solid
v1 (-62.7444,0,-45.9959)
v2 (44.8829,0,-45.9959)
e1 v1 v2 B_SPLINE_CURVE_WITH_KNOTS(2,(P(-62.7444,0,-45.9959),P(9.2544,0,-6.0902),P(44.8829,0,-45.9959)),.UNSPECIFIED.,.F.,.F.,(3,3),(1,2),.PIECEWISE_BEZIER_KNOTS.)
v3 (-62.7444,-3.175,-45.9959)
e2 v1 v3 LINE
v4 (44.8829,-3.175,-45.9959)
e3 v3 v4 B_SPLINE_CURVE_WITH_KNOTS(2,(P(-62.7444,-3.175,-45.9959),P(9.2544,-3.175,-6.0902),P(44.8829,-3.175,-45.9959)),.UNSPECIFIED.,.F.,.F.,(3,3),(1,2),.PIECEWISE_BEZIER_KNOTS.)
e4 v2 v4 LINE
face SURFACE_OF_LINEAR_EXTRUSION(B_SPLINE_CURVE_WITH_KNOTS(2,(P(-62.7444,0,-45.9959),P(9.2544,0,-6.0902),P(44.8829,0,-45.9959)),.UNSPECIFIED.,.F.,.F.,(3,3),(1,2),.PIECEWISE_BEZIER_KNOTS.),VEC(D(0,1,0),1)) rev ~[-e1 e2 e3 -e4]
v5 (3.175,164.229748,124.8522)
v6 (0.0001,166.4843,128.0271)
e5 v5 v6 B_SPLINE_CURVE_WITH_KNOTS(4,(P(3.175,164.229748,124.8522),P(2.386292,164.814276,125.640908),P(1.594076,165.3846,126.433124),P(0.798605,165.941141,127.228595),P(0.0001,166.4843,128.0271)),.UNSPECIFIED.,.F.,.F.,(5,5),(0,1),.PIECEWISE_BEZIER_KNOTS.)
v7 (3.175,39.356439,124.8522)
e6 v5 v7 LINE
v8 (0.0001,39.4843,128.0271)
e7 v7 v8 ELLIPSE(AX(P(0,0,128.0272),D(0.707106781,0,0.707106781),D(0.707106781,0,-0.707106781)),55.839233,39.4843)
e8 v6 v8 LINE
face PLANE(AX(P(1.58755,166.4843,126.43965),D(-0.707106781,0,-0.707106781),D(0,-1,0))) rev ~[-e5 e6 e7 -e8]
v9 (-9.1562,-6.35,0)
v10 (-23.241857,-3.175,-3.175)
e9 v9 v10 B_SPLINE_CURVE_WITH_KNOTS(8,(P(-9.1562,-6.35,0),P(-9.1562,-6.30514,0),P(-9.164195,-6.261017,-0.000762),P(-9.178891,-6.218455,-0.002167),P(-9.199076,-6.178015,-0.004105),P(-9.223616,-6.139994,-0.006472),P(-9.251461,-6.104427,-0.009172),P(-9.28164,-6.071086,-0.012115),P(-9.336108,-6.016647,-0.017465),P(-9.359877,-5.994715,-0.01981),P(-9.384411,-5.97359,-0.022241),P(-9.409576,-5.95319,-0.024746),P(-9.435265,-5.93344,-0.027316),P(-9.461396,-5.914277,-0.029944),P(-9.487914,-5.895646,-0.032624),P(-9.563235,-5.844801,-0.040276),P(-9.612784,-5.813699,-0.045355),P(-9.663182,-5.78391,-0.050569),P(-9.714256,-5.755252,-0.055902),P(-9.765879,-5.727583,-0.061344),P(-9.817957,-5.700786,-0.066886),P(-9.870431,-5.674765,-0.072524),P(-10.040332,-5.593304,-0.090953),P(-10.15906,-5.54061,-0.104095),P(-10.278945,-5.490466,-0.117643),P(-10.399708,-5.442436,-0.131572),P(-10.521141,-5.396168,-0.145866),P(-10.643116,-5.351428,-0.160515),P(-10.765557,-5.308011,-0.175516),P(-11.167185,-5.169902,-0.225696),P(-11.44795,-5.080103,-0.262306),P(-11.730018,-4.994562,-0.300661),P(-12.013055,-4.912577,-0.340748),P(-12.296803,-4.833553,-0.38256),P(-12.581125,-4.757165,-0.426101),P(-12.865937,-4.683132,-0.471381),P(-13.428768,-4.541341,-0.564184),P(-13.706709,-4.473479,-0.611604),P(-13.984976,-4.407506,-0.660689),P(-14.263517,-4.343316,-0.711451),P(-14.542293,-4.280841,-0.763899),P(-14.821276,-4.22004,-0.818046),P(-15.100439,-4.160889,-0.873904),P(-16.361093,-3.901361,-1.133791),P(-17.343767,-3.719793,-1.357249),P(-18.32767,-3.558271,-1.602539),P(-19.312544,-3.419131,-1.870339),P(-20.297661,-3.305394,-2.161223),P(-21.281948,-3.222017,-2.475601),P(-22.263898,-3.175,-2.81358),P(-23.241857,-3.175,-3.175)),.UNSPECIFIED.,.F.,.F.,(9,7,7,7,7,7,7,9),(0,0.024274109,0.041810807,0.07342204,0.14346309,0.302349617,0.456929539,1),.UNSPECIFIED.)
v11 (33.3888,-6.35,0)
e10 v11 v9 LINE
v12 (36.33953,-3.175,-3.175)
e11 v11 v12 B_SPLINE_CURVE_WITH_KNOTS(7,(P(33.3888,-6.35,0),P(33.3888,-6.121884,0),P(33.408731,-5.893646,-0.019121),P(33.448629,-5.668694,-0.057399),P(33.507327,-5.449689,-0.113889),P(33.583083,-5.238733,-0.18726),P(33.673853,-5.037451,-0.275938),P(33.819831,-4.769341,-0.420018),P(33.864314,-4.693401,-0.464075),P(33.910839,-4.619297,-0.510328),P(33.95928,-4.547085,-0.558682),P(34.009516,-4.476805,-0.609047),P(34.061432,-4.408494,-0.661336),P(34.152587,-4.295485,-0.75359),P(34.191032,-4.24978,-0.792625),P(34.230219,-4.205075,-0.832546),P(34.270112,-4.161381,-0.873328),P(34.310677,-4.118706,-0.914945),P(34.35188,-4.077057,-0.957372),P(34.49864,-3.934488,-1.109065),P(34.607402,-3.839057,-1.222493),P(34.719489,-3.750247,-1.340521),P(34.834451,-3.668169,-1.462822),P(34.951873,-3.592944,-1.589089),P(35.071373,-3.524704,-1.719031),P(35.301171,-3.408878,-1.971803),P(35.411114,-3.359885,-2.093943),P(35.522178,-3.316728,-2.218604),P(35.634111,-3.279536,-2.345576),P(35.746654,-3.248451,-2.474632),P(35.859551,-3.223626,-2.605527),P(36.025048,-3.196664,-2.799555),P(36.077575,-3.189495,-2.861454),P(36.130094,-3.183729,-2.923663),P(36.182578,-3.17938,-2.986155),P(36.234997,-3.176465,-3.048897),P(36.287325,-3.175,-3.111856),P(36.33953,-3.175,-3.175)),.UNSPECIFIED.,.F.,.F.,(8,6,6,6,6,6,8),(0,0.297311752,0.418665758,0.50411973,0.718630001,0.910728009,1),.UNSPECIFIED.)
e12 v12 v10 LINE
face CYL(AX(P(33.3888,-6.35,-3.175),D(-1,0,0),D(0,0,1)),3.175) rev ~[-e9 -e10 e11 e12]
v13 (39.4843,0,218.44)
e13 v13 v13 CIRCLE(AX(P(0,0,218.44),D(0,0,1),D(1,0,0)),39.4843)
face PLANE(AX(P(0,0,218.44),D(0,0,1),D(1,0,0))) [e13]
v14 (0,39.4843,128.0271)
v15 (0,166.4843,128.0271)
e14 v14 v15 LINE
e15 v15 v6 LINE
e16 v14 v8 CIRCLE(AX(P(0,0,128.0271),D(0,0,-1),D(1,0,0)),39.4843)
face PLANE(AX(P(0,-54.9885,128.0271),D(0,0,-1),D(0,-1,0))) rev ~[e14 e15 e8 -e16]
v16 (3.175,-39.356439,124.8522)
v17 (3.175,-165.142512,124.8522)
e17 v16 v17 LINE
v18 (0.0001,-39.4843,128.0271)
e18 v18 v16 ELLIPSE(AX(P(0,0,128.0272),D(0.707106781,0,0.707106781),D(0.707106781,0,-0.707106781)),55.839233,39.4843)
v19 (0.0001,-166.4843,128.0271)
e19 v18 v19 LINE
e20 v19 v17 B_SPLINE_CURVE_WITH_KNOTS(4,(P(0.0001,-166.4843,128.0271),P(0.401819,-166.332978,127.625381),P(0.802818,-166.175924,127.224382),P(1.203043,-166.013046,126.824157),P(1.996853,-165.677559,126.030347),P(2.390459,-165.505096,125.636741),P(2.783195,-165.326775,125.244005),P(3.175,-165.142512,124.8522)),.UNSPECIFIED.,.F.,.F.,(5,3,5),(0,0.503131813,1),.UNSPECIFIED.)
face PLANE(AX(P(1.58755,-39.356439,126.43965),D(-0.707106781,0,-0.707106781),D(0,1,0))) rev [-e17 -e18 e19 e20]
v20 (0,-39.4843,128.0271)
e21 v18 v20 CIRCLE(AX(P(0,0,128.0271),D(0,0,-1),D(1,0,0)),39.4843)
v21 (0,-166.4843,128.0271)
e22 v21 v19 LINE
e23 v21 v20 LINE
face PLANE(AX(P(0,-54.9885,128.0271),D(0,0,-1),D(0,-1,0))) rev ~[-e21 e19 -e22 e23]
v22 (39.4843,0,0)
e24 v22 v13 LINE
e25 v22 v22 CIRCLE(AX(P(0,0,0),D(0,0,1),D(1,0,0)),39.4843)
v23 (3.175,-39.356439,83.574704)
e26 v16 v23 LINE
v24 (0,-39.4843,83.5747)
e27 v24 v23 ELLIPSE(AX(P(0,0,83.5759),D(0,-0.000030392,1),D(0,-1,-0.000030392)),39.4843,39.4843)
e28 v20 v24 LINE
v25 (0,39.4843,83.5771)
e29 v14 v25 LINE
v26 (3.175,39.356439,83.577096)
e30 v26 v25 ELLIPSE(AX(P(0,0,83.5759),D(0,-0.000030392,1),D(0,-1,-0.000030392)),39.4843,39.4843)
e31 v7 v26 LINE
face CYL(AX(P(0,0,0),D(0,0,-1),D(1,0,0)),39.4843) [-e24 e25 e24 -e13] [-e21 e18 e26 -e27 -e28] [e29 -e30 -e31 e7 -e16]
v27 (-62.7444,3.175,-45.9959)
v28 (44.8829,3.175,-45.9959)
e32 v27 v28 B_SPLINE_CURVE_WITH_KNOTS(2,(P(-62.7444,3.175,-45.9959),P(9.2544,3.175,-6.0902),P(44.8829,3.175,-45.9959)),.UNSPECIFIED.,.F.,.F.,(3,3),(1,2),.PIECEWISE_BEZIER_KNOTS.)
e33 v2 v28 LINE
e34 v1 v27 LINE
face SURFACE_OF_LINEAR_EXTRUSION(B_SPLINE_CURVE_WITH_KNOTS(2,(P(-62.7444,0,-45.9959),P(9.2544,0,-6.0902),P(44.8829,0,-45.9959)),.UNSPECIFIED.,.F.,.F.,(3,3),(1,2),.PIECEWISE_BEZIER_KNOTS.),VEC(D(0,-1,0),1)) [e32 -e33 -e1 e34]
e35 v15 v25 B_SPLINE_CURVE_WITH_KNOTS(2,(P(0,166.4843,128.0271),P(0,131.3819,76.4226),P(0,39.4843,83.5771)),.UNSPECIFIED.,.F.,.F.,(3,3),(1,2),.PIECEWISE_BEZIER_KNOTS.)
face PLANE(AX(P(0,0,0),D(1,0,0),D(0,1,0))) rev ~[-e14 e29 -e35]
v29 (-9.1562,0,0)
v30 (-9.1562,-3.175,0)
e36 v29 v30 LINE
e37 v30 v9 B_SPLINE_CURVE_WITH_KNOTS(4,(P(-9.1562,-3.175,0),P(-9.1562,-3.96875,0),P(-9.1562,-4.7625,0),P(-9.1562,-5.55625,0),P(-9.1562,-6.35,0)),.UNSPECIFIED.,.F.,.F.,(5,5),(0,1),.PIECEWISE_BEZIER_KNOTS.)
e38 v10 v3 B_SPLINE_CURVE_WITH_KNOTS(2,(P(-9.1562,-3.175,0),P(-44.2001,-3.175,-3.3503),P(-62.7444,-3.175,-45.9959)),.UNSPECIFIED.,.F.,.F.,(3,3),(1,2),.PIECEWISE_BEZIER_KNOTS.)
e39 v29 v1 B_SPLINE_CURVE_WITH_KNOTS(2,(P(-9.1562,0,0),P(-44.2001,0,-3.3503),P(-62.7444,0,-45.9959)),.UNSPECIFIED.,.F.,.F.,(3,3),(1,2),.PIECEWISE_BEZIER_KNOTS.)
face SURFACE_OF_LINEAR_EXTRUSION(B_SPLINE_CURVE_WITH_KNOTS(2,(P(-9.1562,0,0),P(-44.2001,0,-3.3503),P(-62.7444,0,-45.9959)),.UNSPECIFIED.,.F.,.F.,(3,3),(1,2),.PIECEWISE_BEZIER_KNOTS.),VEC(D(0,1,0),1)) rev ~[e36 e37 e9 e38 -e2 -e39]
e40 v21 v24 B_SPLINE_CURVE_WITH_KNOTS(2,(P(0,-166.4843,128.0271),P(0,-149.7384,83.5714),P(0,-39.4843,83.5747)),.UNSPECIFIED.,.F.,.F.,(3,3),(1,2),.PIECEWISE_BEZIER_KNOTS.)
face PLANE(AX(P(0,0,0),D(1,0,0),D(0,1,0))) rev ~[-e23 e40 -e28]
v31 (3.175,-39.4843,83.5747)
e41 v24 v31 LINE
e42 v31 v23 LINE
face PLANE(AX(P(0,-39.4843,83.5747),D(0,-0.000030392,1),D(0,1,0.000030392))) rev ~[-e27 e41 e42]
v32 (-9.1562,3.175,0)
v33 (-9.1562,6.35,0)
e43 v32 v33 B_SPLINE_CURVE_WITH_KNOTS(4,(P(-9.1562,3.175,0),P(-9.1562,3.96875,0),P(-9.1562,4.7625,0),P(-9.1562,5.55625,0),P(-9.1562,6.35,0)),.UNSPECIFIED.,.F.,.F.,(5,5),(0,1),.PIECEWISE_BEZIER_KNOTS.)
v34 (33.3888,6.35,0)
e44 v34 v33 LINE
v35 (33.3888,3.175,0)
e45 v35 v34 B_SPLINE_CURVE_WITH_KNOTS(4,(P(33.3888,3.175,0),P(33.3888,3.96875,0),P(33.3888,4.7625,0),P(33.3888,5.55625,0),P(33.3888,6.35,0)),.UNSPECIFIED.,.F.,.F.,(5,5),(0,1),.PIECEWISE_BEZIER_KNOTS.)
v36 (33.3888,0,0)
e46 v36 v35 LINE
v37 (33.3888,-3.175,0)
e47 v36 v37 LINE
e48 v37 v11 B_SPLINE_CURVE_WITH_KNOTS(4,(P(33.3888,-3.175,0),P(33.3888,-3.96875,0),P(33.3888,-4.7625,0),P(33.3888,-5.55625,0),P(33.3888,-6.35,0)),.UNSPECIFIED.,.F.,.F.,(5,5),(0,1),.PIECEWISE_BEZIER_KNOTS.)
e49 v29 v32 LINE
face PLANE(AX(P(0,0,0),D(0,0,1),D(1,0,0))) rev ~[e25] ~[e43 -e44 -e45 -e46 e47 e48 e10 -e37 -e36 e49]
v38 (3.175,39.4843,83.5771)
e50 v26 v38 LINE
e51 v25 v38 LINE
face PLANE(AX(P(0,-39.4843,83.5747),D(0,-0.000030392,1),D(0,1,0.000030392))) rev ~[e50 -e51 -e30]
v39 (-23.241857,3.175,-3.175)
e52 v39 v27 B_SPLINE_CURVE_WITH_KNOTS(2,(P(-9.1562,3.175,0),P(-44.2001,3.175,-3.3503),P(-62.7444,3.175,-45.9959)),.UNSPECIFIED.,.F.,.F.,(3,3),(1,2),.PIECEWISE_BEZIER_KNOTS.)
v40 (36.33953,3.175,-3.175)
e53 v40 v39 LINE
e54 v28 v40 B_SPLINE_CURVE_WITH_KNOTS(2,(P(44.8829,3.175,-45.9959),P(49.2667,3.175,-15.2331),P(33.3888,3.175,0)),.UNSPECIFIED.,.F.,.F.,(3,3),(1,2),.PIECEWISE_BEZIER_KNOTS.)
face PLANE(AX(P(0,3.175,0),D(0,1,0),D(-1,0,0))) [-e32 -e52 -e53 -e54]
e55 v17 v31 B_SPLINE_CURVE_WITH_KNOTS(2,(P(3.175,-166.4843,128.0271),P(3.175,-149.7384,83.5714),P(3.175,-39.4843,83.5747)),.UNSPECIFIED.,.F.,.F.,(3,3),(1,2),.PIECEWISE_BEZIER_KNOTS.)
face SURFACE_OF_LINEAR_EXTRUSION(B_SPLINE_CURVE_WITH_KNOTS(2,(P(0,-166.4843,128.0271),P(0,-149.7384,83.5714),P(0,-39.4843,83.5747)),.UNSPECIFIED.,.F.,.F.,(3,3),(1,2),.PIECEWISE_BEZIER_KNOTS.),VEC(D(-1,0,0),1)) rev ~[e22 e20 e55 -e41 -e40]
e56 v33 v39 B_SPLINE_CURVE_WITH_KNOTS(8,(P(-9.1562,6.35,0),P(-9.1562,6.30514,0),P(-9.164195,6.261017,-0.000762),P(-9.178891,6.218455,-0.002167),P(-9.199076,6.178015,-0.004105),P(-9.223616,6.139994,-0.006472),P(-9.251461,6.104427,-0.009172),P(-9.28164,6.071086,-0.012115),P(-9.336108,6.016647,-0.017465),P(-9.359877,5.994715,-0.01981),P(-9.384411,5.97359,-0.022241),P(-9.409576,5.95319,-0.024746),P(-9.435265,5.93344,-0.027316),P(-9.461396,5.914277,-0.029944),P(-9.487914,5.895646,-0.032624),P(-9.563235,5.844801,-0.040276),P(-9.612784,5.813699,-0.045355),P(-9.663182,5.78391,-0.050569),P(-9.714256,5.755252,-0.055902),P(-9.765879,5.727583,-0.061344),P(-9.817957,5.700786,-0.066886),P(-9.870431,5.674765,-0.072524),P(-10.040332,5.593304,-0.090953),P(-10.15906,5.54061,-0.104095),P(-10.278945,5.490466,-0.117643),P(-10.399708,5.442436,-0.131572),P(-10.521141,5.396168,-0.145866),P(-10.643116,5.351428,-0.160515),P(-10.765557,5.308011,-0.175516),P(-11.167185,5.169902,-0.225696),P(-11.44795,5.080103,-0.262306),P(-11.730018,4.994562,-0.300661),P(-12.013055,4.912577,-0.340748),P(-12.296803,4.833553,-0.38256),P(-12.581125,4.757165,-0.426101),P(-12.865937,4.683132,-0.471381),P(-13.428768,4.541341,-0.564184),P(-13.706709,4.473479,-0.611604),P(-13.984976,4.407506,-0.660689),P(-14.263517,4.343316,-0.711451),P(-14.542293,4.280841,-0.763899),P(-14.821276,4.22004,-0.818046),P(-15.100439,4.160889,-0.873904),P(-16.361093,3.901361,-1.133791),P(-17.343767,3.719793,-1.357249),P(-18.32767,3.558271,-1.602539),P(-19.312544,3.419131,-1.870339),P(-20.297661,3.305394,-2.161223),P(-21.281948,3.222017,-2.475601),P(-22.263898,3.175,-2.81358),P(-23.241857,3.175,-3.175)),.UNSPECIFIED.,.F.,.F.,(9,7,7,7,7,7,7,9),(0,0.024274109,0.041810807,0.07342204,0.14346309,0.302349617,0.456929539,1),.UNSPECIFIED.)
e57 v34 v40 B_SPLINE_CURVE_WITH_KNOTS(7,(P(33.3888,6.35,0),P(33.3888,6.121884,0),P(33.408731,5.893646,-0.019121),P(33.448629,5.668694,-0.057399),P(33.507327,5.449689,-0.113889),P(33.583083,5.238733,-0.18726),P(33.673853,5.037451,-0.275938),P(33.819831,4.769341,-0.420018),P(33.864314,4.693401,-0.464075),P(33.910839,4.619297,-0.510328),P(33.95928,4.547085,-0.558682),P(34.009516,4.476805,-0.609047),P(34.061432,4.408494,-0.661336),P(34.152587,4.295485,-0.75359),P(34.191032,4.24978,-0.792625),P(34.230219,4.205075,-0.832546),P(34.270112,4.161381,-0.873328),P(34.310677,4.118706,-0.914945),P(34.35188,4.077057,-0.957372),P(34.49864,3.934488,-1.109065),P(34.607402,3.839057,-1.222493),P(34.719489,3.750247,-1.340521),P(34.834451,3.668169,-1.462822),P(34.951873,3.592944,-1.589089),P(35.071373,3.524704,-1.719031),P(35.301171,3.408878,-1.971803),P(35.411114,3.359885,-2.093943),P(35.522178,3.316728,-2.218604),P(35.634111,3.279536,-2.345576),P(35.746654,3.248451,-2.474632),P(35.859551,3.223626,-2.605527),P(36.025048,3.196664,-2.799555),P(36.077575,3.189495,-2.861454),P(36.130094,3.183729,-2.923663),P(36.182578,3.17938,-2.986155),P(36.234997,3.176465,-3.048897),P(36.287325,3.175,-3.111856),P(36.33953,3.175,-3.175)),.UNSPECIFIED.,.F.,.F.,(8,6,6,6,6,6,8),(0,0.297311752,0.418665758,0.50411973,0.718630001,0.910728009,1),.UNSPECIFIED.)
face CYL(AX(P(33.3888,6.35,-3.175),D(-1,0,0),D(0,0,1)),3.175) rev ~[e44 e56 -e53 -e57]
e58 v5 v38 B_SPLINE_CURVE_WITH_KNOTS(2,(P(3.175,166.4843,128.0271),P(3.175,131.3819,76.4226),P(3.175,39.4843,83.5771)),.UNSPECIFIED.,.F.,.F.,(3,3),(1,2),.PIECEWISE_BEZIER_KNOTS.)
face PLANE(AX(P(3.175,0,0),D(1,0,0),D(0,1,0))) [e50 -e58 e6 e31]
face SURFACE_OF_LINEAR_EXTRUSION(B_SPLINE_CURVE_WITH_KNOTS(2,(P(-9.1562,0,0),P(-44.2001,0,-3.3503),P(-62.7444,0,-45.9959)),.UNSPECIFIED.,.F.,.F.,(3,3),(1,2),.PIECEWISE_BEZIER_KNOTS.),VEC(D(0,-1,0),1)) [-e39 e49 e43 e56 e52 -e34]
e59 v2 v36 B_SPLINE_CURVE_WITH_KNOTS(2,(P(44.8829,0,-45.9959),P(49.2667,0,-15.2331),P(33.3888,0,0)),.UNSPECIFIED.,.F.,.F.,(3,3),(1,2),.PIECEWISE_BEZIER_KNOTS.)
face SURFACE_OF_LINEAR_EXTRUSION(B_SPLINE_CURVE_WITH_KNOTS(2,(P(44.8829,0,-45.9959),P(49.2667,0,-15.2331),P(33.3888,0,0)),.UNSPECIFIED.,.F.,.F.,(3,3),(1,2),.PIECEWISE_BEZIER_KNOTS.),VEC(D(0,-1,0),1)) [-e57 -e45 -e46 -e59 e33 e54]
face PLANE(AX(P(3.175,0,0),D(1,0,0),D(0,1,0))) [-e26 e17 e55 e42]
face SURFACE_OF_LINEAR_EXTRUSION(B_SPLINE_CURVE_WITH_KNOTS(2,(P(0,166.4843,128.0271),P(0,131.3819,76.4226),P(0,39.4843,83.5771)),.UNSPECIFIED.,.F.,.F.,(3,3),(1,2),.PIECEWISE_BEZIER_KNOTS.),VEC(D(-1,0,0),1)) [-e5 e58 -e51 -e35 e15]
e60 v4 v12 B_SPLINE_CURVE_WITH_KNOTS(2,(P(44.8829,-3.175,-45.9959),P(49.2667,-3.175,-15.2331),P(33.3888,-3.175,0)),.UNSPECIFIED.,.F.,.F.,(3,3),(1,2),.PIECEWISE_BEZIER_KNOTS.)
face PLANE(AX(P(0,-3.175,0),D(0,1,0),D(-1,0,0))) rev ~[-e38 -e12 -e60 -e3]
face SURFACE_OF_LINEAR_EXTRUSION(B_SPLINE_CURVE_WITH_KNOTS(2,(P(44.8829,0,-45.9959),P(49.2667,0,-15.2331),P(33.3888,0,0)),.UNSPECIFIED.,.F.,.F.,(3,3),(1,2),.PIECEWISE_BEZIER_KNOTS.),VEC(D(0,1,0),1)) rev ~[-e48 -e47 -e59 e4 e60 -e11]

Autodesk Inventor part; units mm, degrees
ref_plane "YZ Plane" through (0, 0, 0) normal (1, 0, 0) x (0, 1, 0)
ref_plane "XZ Plane" through (0, 0, 0) normal (0, 1, 0) x (-1, 0, 0)
ref_plane "XY Plane" through (0, 0, 0) normal (0, 0, 1) x (1, 0, 0)
sketch "Sketch1" plane through (0, 0, 0) normal (0, 0, 1) x (1, 0, 0)
  circle A0 centre (0, 0) radius 39.4843
  dimension "d0" = 78.9686
extrude "Extrusion1" add sketch "Sketch1" along normal blind 218.44
sketch "Sketch2" plane through (0, 0, 0) normal (1, 0, 0) x (0, 1, 0)
  line L0 (39.4843, 0) -> (39.4843, 218.44)
  line L1 (39.4843, 83.5771) -> (39.4843, 128.0271)
  line L2 (39.4843, 128.0271) -> (166.4843, 128.0271)
  line L3 (166.4843, 128.0271) -> (131.3819, 76.4226) construction
  line L4 (131.3819, 76.4226) -> (39.4843, 83.5771) construction
  spline S0 degree 2 poles (166.4843, 128.0271) (131.3819, 76.4226) (39.4843, 83.5771) knots 1 1 1 2 2 2
  line L5 (-39.4843, 83.5747) -> (-39.4843, 128.0271)
  line L6 (-39.4843, 0) -> (-39.4843, 218.44) projected
  line L7 (-39.4843, 83.5747) -> (-39.4843, 128.0271)
  line L8 (-39.4843, 128.0271) -> (-166.4843, 128.0271)
  line L9 (-166.4843, 128.0271) -> (-149.7384, 83.5714) construction
  line L10 (-149.7384, 83.5714) -> (-39.4843, 83.5747) construction
  spline S1 degree 2 poles (-166.4843, 128.0271) (-149.7384, 83.5714) (-39.4843, 83.5747) knots 1 1 1 2 2 2
  line L11 (-39.4843, 128.0271) -> (48.468, 128.0271)
  line L12 (-39.4843, 83.5747) -> (39.4843, 83.5771)
  line L13 (-54.9885, 128.0271) -> (39.4843, 128.0271)
  line L14 (39.4843, 0) -> (39.4843, 218.44) projected
  line L15 (-39.4843, 83.5747) -> (39.4843, 83.5771)
  point P0 (0, 0)
  dimension "d3" = 44.45
  dimension "d4" = 127
  dimension "d5" = 127
extrude "Extrusion2" add sketch "Sketch2" along normal blind 3.175
chamfer "Chamfer1" distance 3.175 angle 45 1 edges at (3.175, -102.9204, 128.0271)
chamfer "Chamfer2" distance 3.175 angle 45 1 edges at (3.175, 102.9204, 128.0271)
sketch "Sketch3" plane through (0, 0, 0) normal (0, 1, 0) x (-1, 0, 0)
  line L0 (-39.4843, 0) -> (39.4843, 0) projected
  line L1 (-33.3888, 0) -> (9.1562, 0)
  line L2 (9.1562, 0) -> (44.2001, -3.3503) construction
  line L3 (44.2001, -3.3503) -> (62.7444, -45.9959) construction
  spline S0 degree 2 poles (9.1562, 0) (44.2001, -3.3503) (62.7444, -45.9959) knots 1 1 1 2 2 2
  line L4 (62.7444, -45.9959) -> (-9.2544, -6.0902) construction
  line L5 (-9.2544, -6.0902) -> (-44.8829, -45.9959) construction
  spline S1 degree 2 poles (62.7444, -45.9959) (-9.2544, -6.0902) (-44.8829, -45.9959) knots 1 1 1 2 2 2
  line L6 (-44.8829, -45.9959) -> (-49.2667, -15.2331) construction
  line L7 (-49.2667, -15.2331) -> (-33.3888, 0) construction
  spline S2 degree 2 poles (-44.8829, -45.9959) (-49.2667, -15.2331) (-33.3888, 0) knots 1 1 1 2 2 2
  point P0 (0, 0)
  dimension "d14" = 42.545
extrude "Extrusion3" add sketch "Sketch3" along normal mid plane 6.35
fillet "Fillet1" radius 3.175 1 edges at (12.1163, 3.175, 0)
fillet "Fillet2" radius 3.175 1 edges at (12.1163, -3.175, 0)
sketch "Sketch4" plane through (0, 0, 218.44) normal (0, 0, 1) x (1, 0, 0)
  point P0 (0, 0)
properties part number "wings"
